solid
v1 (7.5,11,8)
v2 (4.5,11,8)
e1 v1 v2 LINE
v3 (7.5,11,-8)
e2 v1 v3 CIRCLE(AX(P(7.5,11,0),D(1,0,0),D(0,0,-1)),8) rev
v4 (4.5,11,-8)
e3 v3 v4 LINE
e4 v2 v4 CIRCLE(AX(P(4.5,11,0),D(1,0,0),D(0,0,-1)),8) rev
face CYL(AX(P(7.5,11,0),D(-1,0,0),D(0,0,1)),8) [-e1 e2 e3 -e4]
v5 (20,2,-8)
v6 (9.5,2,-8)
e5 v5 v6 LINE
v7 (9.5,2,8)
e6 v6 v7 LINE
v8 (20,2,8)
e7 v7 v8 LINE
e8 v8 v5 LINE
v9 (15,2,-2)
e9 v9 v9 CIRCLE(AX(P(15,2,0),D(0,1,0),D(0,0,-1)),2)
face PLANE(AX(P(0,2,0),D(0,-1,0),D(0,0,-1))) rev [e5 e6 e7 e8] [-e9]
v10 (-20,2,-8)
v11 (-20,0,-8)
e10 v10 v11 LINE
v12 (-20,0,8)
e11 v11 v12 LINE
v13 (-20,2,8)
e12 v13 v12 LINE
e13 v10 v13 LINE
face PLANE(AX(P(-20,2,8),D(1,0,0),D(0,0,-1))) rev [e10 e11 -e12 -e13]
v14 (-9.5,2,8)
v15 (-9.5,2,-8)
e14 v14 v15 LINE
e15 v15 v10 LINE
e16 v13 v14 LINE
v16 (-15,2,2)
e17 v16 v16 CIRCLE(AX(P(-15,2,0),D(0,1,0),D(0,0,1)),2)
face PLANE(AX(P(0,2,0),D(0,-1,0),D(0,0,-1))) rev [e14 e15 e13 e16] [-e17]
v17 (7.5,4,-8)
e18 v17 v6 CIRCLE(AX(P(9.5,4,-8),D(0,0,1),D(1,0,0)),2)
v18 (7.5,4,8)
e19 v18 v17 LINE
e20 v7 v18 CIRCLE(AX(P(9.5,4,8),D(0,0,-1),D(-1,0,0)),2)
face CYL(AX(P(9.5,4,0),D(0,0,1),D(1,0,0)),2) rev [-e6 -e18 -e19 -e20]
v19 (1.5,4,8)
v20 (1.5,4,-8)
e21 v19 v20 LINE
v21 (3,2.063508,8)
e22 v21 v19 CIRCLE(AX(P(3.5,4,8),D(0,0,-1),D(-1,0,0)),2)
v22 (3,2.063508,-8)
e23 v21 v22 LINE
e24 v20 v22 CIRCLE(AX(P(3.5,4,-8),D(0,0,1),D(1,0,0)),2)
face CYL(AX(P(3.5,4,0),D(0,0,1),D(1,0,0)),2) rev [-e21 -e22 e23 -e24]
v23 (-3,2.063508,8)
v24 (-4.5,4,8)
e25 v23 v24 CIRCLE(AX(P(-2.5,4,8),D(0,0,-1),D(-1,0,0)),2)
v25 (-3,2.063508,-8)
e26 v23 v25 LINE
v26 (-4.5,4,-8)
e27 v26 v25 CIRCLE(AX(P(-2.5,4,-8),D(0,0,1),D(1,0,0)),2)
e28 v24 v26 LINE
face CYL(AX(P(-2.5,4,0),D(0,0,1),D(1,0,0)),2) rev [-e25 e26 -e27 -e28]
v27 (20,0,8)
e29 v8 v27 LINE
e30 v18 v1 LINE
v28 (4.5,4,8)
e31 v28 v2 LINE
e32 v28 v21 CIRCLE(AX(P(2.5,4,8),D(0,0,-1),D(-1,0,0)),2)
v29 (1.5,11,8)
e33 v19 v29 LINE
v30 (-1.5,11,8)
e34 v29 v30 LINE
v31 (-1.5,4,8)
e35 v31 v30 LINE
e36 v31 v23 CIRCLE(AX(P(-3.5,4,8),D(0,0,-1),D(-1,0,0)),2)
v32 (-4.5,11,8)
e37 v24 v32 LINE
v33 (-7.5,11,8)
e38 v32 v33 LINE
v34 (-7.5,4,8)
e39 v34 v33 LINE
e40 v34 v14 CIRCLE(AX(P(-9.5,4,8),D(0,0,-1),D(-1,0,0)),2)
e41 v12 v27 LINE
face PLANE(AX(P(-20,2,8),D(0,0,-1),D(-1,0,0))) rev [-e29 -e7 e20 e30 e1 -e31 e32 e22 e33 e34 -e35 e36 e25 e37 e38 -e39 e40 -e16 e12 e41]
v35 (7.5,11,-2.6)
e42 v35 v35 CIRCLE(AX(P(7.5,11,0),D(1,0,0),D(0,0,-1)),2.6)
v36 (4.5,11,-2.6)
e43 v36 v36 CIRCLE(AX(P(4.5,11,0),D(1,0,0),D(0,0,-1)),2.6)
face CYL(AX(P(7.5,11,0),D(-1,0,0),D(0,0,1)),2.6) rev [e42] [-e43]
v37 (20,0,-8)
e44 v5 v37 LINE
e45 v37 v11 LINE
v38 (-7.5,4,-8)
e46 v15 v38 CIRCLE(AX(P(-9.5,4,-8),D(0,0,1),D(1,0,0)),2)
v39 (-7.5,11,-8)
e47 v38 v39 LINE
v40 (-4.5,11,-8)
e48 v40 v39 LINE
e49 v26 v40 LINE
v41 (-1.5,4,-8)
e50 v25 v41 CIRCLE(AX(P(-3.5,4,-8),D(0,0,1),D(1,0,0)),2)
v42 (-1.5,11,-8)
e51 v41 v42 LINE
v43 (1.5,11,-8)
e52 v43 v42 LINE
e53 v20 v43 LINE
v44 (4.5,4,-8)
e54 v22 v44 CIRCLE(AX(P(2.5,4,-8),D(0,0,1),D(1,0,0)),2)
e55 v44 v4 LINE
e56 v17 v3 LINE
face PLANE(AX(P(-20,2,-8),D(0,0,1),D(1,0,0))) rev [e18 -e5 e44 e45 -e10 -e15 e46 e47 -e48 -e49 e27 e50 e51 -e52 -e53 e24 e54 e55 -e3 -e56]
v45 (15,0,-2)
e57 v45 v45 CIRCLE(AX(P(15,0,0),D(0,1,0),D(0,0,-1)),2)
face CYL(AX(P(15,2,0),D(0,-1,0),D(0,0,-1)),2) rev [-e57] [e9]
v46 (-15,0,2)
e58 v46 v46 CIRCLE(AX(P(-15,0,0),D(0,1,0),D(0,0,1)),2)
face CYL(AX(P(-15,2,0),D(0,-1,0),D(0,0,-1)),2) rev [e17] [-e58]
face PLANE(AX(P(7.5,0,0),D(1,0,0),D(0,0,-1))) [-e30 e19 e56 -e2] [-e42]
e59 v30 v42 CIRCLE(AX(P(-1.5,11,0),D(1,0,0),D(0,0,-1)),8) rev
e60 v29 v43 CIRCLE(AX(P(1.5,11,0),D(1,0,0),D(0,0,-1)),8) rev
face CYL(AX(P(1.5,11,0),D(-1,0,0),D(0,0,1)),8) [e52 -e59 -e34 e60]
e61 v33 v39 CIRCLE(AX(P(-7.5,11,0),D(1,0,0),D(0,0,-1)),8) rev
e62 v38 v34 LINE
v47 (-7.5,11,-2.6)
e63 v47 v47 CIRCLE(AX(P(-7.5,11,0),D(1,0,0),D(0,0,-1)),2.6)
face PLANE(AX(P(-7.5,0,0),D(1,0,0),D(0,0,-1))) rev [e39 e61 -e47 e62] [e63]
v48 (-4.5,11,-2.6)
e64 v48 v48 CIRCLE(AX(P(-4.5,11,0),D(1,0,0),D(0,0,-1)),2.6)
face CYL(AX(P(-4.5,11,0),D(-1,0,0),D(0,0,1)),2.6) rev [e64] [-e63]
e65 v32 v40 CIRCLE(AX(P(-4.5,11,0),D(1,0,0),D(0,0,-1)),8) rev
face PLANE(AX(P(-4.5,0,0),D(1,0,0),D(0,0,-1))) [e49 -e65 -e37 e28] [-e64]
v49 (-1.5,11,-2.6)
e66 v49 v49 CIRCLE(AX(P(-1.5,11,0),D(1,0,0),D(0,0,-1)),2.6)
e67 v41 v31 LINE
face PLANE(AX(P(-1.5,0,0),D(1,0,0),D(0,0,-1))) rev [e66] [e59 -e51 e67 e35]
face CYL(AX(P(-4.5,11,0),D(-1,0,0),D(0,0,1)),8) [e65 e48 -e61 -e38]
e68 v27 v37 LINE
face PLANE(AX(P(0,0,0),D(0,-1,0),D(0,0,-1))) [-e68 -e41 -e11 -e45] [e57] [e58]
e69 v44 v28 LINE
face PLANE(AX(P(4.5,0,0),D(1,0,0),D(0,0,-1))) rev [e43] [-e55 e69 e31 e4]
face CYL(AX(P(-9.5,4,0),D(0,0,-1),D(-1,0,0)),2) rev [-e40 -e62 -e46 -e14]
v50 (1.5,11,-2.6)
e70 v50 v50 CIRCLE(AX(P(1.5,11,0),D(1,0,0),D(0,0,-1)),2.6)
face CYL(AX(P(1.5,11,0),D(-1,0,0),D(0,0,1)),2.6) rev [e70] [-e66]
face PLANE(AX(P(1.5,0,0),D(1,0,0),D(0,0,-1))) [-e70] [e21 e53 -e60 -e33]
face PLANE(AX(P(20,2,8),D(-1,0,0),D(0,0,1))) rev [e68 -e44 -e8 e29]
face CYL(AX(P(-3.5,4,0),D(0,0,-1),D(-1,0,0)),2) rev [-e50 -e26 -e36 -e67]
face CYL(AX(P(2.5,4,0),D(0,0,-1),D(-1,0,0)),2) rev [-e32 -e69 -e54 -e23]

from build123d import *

# Parameters (mm, degrees)
SKETCH_1_W                 = 40
SKETCH_1_H                 = 16
SKETCH_1_R                 = 2
EXTRUDE_1_DEPTH            = 2
SKETCH_2_R                 = 2.6
EXTRUDE_2_DEPTH            = 1.5
PATTERN_LINEAR_1_COUNT     = 2
PATTERN_LINEAR_1_PITCH     = 6
PATTERN_LINEAR_1_COL_COUNT = 2
PATTERN_LINEAR_1_COL_PITCH = 6
FILLET_1_R                 = 2


with BuildPart() as part:
    # 草圖1 → 填料-伸長1 (new body)
    with BuildSketch(Plane(origin=(0, 0, 0), x_dir=(1, 0, 0), z_dir=(0, 1, 0))):
        Rectangle(SKETCH_1_W, SKETCH_1_H)
        with Locations(Location((-15, 0, 0), (0, 0, 270))):
            Circle(SKETCH_1_R, mode=Mode.SUBTRACT)
        with Locations(Location((15, 0, 0), (0, 0, 90))):
            Circle(SKETCH_1_R, mode=Mode.SUBTRACT)
    extrude(amount=EXTRUDE_1_DEPTH)

    # 草圖2 → 填料-伸長2 (add, symmetric)
    with BuildSketch(Plane(origin=(0, 0, 0), x_dir=(0, 0, -1), z_dir=(1, 0, 0))):
        with BuildLine():
            Line((8, 2), (-8, 2))
            Line((-8, 2), (-8, 11))
            ThreePointArc((-8, 11), (0, 19), (8, 11))
            Line((8, 11), (8, 2))
        make_face()
        with Locations((0, 11)):
            Circle(SKETCH_2_R, mode=Mode.SUBTRACT)
    extrude_2 = extrude(amount=EXTRUDE_2_DEPTH, both=True)

    # 直線複製排列1: 填料-伸長2 ×2
    with Locations(*[(i * PATTERN_LINEAR_1_PITCH, 0, 0) for i in range(1, PATTERN_LINEAR_1_COUNT)]):
        add(extrude_2)

    # 直線複製排列1 col: 填料-伸長2 ×2
    with Locations(*[(-i * PATTERN_LINEAR_1_COL_PITCH, 0, 0) for i in range(1, PATTERN_LINEAR_1_COL_COUNT)]):
        add(extrude_2)

    # 圓角1
    # the kernel refuses this fillet: 2 mm, written as the material it adds along each edge
    with BuildSketch(Plane(origin=(1.5, 2, -8), x_dir=(0, 1, 0), z_dir=(0, 0, 1)), Plane(origin=(-1.5, 2, -8), x_dir=(-1, 0, 0), z_dir=(0, 0, 1)), Plane(origin=(-7.5, 2, -8), x_dir=(-1, 0, 0), z_dir=(0, 0, 1)), Plane(origin=(7.5, 2, -8), x_dir=(0, 1, 0), z_dir=(0, 0, 1)), Plane(origin=(4.5, 2, -8), x_dir=(-1, 0, 0), z_dir=(0, 0, 1))) as fillet_1_piece_1:
        with BuildLine():
            CenterArc((FILLET_1_R, -FILLET_1_R), FILLET_1_R, 90, 90)
            Line((0, -FILLET_1_R), (0, 0))
            Line((0, 0), (FILLET_1_R, 0))
        make_face()
    extrude(amount=16)
    with BuildSketch(Plane(origin=(-4.5, 2, -8), x_dir=(1, 0, 0), z_dir=(0, 0, 1))) as fillet_1_piece_2:
        with BuildLine():
            CenterArc((FILLET_1_R, FILLET_1_R), FILLET_1_R, 180, 90)
            Line((0, FILLET_1_R), (0, 0))
            Line((0, 0), (FILLET_1_R, 0))
        make_face()
    extrude(amount=16)


solid = part.part
